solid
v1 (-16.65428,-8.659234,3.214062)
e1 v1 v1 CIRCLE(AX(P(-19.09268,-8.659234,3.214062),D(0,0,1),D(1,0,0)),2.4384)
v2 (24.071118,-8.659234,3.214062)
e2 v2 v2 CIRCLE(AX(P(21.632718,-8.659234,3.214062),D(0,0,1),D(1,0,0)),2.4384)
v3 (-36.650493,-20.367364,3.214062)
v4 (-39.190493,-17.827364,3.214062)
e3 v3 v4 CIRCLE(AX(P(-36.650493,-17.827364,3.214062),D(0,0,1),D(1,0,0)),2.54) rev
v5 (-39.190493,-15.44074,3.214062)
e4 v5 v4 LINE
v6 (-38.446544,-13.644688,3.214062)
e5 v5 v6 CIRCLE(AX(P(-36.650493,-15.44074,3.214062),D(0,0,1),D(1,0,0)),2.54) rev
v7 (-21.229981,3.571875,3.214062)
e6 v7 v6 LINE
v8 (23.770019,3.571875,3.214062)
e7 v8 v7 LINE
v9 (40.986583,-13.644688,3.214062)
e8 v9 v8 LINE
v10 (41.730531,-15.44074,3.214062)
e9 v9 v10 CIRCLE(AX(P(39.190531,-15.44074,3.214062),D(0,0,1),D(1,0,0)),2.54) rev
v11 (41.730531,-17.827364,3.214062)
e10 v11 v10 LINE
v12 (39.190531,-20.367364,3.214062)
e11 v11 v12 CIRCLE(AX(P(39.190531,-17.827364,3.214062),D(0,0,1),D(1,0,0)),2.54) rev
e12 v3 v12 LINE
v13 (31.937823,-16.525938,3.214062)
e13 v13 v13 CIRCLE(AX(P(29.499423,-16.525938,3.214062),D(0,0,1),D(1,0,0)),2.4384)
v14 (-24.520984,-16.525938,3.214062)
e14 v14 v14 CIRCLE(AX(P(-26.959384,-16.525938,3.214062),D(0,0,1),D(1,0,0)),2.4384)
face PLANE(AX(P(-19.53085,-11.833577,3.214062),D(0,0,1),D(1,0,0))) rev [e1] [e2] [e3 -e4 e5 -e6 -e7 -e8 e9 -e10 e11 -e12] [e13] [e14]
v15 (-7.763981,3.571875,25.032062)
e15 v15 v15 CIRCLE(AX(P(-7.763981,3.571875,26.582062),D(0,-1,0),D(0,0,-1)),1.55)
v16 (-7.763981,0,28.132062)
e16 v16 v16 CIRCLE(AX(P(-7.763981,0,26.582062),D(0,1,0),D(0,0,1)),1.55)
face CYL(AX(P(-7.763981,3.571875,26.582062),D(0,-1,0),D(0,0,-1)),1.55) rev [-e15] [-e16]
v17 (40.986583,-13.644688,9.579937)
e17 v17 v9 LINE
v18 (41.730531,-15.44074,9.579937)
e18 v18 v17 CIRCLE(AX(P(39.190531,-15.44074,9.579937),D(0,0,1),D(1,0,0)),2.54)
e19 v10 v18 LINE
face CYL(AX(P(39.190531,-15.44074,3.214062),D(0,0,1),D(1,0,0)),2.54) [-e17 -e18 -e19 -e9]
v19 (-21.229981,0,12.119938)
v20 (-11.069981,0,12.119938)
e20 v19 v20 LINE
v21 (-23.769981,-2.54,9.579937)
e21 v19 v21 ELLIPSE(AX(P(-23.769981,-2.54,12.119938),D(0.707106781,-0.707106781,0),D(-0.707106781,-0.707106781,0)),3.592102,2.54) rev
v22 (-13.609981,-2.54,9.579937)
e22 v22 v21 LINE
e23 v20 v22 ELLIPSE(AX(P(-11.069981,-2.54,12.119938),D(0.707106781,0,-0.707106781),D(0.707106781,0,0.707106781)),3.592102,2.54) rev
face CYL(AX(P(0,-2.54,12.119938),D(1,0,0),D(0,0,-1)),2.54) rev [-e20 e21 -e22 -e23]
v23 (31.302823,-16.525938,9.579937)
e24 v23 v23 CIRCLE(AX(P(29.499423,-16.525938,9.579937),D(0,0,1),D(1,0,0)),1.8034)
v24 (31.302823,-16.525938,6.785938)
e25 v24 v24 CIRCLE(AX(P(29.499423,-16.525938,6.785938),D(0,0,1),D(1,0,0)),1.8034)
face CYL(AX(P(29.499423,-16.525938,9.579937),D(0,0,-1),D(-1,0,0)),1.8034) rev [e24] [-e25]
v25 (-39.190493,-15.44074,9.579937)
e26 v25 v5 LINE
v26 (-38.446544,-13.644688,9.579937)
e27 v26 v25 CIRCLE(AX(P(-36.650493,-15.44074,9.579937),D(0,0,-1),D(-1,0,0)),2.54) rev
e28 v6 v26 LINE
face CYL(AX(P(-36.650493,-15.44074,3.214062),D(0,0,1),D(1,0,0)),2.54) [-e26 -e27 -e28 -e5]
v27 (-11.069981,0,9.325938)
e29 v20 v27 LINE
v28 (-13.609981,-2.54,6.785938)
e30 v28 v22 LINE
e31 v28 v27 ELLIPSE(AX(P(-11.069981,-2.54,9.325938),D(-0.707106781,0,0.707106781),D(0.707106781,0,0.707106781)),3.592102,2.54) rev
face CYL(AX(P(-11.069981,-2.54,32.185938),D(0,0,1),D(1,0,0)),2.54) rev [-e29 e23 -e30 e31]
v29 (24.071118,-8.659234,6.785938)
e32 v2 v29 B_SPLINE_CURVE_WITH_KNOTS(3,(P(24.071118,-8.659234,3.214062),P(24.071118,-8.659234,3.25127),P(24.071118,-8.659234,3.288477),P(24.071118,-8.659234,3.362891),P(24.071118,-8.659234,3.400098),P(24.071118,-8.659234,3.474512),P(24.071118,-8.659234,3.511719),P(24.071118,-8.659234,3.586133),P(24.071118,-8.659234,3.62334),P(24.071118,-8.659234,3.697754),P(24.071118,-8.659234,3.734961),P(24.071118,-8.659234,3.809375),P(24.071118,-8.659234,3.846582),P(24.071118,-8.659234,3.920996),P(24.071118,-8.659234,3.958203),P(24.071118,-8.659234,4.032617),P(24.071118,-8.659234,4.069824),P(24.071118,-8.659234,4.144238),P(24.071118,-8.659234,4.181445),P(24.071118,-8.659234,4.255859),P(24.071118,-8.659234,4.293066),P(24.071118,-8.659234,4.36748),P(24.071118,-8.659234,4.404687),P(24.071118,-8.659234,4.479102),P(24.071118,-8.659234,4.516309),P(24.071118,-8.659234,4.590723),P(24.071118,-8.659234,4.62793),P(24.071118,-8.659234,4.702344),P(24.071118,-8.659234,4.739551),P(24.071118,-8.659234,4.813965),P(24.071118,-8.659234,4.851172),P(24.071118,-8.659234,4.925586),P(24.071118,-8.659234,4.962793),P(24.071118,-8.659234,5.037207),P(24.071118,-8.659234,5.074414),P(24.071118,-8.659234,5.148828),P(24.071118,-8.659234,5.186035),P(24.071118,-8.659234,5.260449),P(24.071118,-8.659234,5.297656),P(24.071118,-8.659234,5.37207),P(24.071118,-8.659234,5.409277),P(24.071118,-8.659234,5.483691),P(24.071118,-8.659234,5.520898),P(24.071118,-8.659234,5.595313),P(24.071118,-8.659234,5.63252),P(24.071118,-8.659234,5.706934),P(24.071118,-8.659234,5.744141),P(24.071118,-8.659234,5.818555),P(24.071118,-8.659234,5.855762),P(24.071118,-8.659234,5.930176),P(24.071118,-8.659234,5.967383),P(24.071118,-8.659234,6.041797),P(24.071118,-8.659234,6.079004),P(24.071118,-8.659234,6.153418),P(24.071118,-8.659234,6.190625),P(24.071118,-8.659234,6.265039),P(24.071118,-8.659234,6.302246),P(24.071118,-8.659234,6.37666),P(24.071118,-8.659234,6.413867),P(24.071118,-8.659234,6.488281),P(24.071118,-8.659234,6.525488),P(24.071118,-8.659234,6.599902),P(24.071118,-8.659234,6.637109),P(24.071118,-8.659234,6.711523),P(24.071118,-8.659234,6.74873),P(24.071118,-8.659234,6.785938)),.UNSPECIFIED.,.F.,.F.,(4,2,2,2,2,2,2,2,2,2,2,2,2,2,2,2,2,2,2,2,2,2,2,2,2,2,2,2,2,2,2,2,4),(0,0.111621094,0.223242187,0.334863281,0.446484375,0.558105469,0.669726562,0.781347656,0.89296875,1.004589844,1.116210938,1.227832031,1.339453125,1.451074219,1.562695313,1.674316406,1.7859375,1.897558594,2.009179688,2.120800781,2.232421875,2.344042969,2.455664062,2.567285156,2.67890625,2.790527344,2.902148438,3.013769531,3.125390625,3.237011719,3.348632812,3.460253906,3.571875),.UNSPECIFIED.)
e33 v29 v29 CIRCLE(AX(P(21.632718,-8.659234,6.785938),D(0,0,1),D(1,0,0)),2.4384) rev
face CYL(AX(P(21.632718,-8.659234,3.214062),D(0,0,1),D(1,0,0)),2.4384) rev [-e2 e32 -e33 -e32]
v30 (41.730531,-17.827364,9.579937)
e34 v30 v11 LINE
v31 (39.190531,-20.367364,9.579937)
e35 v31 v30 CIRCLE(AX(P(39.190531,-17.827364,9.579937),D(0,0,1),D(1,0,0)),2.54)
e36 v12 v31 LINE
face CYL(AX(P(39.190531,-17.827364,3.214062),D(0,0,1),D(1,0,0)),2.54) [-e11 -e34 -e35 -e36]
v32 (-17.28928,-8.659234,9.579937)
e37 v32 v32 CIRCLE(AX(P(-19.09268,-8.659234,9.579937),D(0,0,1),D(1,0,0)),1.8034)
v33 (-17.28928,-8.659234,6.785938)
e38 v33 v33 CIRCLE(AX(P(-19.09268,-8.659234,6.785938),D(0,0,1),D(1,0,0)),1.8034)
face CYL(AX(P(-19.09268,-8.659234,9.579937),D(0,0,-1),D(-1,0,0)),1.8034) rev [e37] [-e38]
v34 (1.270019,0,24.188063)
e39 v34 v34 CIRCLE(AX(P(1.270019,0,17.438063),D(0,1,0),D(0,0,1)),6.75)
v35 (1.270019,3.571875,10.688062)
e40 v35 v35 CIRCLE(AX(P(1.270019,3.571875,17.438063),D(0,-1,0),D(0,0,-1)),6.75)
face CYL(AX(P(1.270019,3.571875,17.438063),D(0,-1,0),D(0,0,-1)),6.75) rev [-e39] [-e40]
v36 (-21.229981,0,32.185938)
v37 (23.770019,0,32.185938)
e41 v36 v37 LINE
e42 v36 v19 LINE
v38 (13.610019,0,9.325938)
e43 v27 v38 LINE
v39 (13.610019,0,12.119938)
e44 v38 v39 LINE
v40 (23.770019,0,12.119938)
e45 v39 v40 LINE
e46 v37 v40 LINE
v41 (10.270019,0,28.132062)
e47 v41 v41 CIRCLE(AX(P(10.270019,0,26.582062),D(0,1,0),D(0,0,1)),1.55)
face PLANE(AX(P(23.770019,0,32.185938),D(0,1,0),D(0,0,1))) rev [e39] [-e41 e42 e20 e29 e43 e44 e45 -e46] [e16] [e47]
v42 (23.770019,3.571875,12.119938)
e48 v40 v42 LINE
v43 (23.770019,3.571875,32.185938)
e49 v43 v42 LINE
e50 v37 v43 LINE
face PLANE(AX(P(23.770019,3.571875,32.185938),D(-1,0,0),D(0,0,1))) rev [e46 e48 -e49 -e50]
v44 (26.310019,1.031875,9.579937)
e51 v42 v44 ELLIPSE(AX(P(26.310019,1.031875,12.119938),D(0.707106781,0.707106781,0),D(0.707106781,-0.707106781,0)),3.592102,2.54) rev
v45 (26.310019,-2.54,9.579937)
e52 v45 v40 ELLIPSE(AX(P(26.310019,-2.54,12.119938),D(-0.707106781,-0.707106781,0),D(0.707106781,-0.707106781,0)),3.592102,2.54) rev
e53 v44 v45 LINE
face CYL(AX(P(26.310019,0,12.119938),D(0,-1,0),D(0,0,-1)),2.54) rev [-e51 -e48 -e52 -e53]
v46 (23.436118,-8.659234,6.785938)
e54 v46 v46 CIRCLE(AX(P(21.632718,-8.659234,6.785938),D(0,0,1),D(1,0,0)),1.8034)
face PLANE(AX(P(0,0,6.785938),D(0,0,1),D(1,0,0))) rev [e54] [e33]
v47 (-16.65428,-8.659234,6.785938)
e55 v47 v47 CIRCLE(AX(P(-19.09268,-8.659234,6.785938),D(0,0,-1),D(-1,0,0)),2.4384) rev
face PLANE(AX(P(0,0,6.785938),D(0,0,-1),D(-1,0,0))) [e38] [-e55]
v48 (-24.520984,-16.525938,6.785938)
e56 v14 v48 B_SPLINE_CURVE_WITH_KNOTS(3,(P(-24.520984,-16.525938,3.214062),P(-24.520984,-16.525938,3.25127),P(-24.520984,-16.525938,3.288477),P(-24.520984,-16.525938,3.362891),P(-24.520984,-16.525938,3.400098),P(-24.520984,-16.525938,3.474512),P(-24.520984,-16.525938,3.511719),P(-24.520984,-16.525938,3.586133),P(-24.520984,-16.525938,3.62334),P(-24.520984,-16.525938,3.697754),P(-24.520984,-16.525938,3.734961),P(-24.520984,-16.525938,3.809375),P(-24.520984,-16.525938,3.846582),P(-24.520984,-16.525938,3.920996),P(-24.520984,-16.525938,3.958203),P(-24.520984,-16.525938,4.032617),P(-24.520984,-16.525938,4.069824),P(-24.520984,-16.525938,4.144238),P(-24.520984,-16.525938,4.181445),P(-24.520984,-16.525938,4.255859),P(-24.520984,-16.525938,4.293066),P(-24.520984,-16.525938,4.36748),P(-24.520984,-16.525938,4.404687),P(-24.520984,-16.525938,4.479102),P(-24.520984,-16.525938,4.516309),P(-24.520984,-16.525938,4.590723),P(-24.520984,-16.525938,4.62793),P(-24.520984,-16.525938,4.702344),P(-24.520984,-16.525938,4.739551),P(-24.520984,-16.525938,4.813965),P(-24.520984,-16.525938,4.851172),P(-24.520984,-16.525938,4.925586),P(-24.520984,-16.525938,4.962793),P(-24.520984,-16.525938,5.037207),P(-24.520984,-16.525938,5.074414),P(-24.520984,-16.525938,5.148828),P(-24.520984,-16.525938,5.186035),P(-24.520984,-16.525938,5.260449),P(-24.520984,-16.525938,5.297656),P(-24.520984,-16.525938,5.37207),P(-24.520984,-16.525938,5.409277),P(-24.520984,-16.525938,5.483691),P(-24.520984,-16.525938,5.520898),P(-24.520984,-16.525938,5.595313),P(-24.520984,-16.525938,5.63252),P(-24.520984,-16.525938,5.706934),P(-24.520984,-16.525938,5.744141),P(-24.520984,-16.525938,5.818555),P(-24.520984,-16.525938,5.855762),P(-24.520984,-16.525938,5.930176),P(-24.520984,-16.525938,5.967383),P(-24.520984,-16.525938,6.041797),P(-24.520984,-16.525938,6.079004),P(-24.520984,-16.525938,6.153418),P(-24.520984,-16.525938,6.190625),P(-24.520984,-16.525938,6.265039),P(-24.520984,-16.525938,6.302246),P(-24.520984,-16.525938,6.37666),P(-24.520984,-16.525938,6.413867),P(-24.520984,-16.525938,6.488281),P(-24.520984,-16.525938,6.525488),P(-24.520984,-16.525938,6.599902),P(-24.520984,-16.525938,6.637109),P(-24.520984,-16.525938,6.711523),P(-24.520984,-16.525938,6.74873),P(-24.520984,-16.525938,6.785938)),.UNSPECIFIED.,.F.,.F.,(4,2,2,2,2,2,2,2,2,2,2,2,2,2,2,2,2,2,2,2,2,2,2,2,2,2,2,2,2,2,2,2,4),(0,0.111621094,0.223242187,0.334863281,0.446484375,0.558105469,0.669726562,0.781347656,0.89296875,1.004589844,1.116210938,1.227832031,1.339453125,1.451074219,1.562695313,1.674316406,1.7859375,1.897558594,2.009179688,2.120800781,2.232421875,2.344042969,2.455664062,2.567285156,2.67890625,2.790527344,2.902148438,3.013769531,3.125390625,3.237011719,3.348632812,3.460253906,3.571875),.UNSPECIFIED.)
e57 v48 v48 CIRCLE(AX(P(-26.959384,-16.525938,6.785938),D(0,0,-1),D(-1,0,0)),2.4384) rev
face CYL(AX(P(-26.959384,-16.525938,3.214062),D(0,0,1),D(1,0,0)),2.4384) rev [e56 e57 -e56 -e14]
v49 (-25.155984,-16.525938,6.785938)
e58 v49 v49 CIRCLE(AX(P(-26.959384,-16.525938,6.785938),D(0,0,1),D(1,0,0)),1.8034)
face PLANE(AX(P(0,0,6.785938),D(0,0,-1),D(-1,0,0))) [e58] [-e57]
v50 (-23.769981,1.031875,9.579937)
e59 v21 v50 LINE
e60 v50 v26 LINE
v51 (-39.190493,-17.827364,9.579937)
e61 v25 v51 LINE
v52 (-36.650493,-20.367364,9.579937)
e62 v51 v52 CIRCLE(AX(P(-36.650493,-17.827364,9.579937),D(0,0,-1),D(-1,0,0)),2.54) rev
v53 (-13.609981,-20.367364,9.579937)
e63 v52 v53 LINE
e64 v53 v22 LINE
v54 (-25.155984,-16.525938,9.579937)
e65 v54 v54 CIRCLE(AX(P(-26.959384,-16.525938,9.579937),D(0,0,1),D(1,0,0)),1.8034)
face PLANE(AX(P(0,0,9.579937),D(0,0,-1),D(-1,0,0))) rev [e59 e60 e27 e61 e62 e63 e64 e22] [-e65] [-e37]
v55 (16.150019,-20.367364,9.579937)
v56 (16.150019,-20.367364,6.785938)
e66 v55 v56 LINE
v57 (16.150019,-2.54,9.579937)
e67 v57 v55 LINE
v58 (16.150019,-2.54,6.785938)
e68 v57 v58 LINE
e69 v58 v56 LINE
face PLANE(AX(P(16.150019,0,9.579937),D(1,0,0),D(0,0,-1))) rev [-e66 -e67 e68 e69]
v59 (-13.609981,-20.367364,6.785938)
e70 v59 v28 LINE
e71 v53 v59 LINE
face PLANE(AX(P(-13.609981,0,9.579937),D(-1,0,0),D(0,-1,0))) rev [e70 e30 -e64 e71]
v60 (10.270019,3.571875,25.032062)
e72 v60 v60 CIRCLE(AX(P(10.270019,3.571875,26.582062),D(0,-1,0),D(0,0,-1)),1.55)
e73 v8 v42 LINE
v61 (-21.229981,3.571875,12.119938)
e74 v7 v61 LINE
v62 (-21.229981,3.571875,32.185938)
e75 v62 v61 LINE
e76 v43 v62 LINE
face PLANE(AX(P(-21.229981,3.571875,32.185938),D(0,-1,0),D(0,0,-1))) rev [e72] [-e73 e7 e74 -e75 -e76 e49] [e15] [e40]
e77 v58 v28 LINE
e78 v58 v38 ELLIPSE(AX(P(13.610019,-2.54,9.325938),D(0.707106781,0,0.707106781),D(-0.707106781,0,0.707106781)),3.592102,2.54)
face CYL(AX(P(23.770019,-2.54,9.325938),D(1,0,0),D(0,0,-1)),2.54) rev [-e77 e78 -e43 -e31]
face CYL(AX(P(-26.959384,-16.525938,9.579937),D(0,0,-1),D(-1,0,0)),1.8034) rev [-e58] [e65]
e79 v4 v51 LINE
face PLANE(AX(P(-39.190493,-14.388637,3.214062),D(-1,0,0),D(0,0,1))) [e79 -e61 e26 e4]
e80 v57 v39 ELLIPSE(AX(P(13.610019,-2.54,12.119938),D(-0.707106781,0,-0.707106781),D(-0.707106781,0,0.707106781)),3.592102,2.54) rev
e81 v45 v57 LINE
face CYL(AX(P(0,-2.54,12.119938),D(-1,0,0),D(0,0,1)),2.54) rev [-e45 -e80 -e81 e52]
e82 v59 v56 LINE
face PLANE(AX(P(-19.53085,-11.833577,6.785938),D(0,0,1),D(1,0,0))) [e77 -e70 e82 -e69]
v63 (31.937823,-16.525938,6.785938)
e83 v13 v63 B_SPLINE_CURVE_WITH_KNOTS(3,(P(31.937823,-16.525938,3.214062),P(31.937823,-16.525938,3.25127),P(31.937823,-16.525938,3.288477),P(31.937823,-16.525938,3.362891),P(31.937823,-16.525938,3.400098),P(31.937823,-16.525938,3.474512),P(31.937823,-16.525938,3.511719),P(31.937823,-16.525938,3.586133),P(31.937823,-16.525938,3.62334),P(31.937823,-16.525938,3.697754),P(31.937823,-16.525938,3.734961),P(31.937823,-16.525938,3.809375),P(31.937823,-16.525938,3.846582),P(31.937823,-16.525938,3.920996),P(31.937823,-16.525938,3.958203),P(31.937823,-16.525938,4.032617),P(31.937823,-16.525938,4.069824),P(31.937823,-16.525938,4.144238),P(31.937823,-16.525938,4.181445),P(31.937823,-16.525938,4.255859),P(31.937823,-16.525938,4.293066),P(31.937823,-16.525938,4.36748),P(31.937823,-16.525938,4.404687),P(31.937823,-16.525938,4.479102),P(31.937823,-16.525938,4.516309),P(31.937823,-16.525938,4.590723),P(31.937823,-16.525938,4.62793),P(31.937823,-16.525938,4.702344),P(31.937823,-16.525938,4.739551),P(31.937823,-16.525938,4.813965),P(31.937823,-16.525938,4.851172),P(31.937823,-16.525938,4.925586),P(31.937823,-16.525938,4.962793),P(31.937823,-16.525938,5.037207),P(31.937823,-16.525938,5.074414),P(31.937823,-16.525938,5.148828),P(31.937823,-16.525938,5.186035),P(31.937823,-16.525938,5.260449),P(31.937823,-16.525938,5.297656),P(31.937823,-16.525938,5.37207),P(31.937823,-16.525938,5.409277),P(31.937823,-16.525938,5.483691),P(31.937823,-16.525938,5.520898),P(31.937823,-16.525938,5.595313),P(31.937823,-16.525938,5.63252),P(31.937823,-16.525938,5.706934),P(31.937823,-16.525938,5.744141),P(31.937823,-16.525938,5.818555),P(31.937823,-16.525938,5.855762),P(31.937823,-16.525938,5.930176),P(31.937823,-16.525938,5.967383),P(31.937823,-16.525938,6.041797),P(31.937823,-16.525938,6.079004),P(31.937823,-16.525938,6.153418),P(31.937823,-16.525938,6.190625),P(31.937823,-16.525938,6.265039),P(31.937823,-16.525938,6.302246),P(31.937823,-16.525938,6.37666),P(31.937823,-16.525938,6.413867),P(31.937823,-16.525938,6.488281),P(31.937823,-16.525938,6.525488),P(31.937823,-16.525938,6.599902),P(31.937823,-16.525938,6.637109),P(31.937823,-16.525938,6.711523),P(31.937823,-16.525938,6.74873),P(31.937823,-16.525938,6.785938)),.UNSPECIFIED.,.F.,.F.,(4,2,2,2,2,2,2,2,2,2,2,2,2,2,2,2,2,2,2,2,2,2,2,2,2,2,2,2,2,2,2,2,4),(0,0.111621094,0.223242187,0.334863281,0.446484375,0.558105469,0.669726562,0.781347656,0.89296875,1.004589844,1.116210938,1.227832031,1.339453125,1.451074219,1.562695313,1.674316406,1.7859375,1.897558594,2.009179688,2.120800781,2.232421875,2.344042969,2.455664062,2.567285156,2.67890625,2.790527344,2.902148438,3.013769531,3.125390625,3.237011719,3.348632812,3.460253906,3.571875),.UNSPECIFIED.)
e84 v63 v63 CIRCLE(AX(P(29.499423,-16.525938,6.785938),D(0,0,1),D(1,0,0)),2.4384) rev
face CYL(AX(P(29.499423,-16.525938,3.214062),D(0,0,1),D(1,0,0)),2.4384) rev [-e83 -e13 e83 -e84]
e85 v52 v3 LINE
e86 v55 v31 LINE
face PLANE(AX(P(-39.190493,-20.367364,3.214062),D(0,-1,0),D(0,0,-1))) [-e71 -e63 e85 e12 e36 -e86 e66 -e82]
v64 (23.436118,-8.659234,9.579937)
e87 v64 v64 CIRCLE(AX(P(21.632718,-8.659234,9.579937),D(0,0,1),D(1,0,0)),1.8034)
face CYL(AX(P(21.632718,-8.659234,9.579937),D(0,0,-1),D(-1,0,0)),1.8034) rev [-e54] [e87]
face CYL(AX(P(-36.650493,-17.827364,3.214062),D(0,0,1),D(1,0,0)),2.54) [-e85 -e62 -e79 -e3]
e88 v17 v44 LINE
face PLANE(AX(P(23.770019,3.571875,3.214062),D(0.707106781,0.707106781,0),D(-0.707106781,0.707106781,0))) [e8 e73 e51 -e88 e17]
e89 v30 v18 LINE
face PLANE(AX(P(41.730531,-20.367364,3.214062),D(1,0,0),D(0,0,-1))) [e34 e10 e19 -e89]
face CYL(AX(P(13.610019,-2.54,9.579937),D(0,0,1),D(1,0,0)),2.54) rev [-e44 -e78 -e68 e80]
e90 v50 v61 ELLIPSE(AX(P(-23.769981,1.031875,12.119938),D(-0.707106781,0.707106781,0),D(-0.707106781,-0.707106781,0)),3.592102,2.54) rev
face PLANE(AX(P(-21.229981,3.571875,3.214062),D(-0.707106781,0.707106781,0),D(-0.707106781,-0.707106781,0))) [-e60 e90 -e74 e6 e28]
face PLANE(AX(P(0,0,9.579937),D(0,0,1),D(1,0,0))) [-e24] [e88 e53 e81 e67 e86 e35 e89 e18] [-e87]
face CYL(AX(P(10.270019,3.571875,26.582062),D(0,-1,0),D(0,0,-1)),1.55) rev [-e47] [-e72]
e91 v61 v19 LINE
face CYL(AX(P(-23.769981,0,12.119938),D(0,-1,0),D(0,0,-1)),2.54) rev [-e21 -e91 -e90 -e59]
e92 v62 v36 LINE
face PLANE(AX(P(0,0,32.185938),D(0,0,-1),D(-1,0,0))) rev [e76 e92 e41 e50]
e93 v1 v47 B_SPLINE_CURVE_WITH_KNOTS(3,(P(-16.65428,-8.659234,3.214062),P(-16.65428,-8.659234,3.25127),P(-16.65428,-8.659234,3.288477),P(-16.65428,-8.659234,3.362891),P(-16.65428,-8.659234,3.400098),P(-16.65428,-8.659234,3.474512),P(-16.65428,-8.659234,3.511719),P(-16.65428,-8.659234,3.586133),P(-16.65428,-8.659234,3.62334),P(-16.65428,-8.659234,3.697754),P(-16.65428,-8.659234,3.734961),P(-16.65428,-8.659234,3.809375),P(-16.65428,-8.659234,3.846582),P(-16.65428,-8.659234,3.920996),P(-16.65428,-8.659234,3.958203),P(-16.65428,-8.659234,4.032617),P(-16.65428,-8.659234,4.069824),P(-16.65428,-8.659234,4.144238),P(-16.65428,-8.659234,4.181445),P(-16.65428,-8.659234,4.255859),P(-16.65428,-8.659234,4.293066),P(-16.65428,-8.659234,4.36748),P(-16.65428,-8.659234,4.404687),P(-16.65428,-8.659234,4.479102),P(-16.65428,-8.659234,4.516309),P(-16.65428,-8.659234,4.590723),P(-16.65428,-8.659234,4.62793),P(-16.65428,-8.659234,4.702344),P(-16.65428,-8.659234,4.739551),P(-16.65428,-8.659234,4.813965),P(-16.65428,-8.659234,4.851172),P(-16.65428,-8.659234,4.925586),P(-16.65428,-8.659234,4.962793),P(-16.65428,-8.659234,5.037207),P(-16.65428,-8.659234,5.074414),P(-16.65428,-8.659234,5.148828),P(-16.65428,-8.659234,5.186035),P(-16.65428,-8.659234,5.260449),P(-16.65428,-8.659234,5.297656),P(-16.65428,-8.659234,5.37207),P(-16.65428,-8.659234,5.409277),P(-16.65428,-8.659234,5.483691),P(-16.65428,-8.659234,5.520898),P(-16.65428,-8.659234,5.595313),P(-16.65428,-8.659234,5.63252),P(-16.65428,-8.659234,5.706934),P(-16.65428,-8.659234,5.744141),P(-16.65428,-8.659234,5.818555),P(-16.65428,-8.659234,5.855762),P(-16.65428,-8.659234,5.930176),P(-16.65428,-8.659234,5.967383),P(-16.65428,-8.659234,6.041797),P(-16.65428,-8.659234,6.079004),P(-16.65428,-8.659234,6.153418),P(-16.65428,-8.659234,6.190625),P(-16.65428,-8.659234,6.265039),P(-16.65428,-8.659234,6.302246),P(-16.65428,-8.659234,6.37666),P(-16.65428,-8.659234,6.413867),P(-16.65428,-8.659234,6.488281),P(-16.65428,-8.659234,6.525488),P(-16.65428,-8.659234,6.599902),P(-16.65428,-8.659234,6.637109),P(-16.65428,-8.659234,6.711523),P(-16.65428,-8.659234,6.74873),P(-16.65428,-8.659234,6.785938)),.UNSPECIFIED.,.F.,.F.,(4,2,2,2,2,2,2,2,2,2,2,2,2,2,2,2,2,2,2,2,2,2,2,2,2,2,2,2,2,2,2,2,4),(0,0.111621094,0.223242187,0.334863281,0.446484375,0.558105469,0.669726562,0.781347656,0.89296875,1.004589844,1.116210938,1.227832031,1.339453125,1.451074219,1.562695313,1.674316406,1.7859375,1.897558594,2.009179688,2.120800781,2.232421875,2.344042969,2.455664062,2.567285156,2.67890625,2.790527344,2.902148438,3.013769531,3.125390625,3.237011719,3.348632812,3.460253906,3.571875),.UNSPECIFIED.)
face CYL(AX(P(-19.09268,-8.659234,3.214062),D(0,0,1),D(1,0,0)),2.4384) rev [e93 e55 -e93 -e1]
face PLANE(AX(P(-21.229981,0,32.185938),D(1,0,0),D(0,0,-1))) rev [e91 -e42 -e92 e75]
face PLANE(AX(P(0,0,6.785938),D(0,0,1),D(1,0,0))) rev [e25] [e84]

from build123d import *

# Parameters (mm, degrees)
BOSS_EXTRUDE1_DEPTH      = 1.7859375
BOSS_EXTRUDE1_DEPTH_BACK = 1.7859375
SKETCH2_W                = 45
SKETCH2_H                = 3.571875
BOSS_EXTRUDE2_DEPTH      = 25.4
FILLET1_R                = 2
SKETCH9_W                = 44.9012818
SKETCH9_H                = 1.417156311
CUT_EXTRUDE1_DEPTH       = 10
BOSS_EXTRUDE3_DEPTH      = 3.571875
SKETCH14_R               = 2.4384
CUT_EXTRUDE4_DEPTH       = 53.928506192
CUT_EXTRUDE5_DEPTH       = 57.499569383
CUT_EXTRUDE5_DEPTH_BACK  = 57.499569383
SKETCH15_R               = 6.75
SKETCH15_R_2             = 1.55
SKETCH19_R               = 1.8034
BOSS_EXTRUDE6_DEPTH      = 2.794
FILLET3_R                = 2.54


with BuildPart() as part:
    # Sketch1 → Boss-Extrude1 (new, two sides: drawn at the far end of the back side and taken through both)
    with BuildSketch(Plane.XY.offset(5).offset(-BOSS_EXTRUDE1_DEPTH_BACK)):
        with BuildLine():
            Line((-21.183407813, 0), (-21.183407813, -8.813455393))
            ThreePointArc((-21.183407813, -8.813455393), (-22.866221682, -12.686440931), (-19.530849883, -15.276262248))
            Line((-19.530849883, -15.276262248), (24.68248716, -15.276262248))
            ThreePointArc((24.68248716, -15.276262248), (25.214329472, -14.744419936), (24.68248716, -14.212577623))
            Line((24.68248716, -14.212577623), (23.717873987, 0))
            Line((23.717873987, 0), (23.717873987, 4.989031311))
            Line((23.717873987, 4.989031311), (-21.183407813, 4.989031311))
            Line((-21.183407813, 4.989031311), (-21.183407813, 0))
        make_face()
    extrude(amount=BOSS_EXTRUDE1_DEPTH + BOSS_EXTRUDE1_DEPTH_BACK)

    # Sketch2 → Boss-Extrude2 (add)
    with BuildSketch(Plane.XY.offset(6.7859375)):
        with Locations((1.270019176, 1.7859375)):
            Rectangle(SKETCH2_W, SKETCH2_H)
    extrude(amount=BOSS_EXTRUDE2_DEPTH)

    # Fillet1
    fillet1_edges = [part.edges().sort_by_distance(p)[0] for p in [
        (1.267233087, 4.989031311, 3.2140625),
    ]]
    fillet(fillet1_edges, radius=FILLET1_R)

    # Sketch9 → Cut-Extrude1 (cut)
    with BuildSketch(Plane.XY.offset(6.7859375)):
        with Locations((1.267233087, 4.280453156)):
            Rectangle(SKETCH9_W, SKETCH9_H)
    extrude(amount=-CUT_EXTRUDE1_DEPTH, mode=Mode.SUBTRACT)

    # Sketch13 → Boss-Extrude3 (add, through all)
    with BuildSketch(Plane.XY.offset(6.7859375)):
        Polygon((-21.229980824, 3.571875), (-39.190493066, -14.388637242), (-39.190493066, -20.367363974), (41.730531418, -20.367363974), (41.730531418, -14.388637242), (23.770019176, 3.571875), align=None)
    extrude(amount=-BOSS_EXTRUDE3_DEPTH)

    # Sketch14 → Cut-Extrude4 (cut, through all)
    with BuildSketch(Plane.XY.offset(6.7859375)):
        with Locations((-26.959384229, -16.525938199)):
            Circle(SKETCH14_R)
        with Locations((-19.092679867, -8.659233837)):
            Circle(SKETCH14_R)
        with Locations((21.632718219, -8.659233837)):
            Circle(SKETCH14_R)
        with Locations((29.499422581, -16.525938199)):
            Circle(SKETCH14_R)
    extrude(amount=-CUT_EXTRUDE4_DEPTH, mode=Mode.SUBTRACT)

    # Sketch15 → Cut-Extrude5 (cut, two sides: drawn at the far end of the back side and taken through both)
    with BuildSketch(Plane.XZ.offset(-CUT_EXTRUDE5_DEPTH_BACK)):
        with Locations(Location((1.270019176, 17.4380625, 0), (0, 0, 270))):
            Circle(SKETCH15_R)
        with Locations(Location((-7.763980824, 26.5820625, 0), (0, 0, 270))):
            Circle(SKETCH15_R_2)
        with Locations(Location((10.270019176, 26.5820625, 0), (0, 0, 270))):
            Circle(SKETCH15_R_2)
    extrude(amount=CUT_EXTRUDE5_DEPTH + CUT_EXTRUDE5_DEPTH_BACK, mode=Mode.SUBTRACT)

    # Sketch19 → Boss-Extrude6 (add)
    # profile 1 of 2: a face of its own
    with BuildSketch(Plane.XY.offset(6.7859375)):
        Polygon((-39.190493066, -14.388637242), (-21.229980824, 3.571875), (-21.229980824, 0), (-13.609980824, 0), (-13.609980824, -20.367363974), (-39.190493066, -20.367363974), align=None)
        with Locations((-19.092679867, -8.659233837)):
            Circle(SKETCH19_R, mode=Mode.SUBTRACT)
        with Locations((-26.959384229, -16.525938199)):
            Circle(SKETCH19_R, mode=Mode.SUBTRACT)
    # profile 2 of 2: a face of its own
    with BuildSketch(Plane.XY.offset(6.7859375)):
        Polygon((41.730531418, -20.367363974), (41.730531418, -14.388637242), (23.770019176, 3.571875), (23.770019176, 0), (16.150019176, 0), (16.150019176, -20.367363974), align=None)
        with Locations((21.632718219, -8.659233837)):
            Circle(SKETCH19_R, mode=Mode.SUBTRACT)
        with Locations((29.499422581, -16.525938199)):
            Circle(SKETCH19_R, mode=Mode.SUBTRACT)
    extrude(amount=BOSS_EXTRUDE6_DEPTH)

    # Fillet3
    # the kernel refuses this fillet: 2.54 mm, written as the material it adds along each edge
    with BuildSketch(Plane(origin=(16.150019176, 0, 6.7859375), x_dir=(0, -1, 0), z_dir=(-1, 0, 0))) as fillet3_piece_1:
        with BuildLine():
            CenterArc((FILLET3_R, FILLET3_R), FILLET3_R, 180, 90)
            Line((0, FILLET3_R), (-FILLET3_R * 0.02, FILLET3_R))
            Line((-FILLET3_R * 0.02, FILLET3_R), (-FILLET3_R * 0.02, -FILLET3_R * 0.02))
            Line((-FILLET3_R * 0.02, -FILLET3_R * 0.02), (FILLET3_R, -FILLET3_R * 0.02))
            Line((FILLET3_R, -FILLET3_R * 0.02), (FILLET3_R, 0))
        make_face()
    extrude(amount=29.76)
    with BuildSketch(Plane(origin=(-21.229980824, 0, 9.5799375), x_dir=(0, -1, 0), z_dir=(1, 0, 0))) as fillet3_piece_2:
        with BuildLine():
            CenterArc((FILLET3_R, -FILLET3_R), FILLET3_R, 90, 90)
            Line((0, -FILLET3_R), (-FILLET3_R * 0.02, -FILLET3_R))
            Line((-FILLET3_R * 0.02, -FILLET3_R), (-FILLET3_R * 0.02, FILLET3_R * 0.02))
            Line((-FILLET3_R * 0.02, FILLET3_R * 0.02), (FILLET3_R, FILLET3_R * 0.02))
            Line((FILLET3_R, FILLET3_R * 0.02), (FILLET3_R, 0))
        make_face()
    extrude(amount=7.62)
    with BuildSketch(Plane(origin=(-21.229980824, 3.571875, 9.5799375), x_dir=(-1, 0, 0), z_dir=(0, -1, 0))) as fillet3_piece_3_section:
        with BuildLine():
            CenterArc((FILLET3_R, -FILLET3_R), FILLET3_R, 90, 90)
            Line((0, -FILLET3_R), (-FILLET3_R * 0.02, -FILLET3_R))
            Line((-FILLET3_R * 0.02, -FILLET3_R), (-FILLET3_R * 0.02, FILLET3_R * 0.02))
            Line((-FILLET3_R * 0.02, FILLET3_R * 0.02), (FILLET3_R, FILLET3_R * 0.02))
            Line((FILLET3_R, FILLET3_R * 0.02), (FILLET3_R, 0))
        make_face()
    fillet3_piece_3 = extrude(amount=3.571875, mode=Mode.PRIVATE)
    fillet3_piece_3 = split(fillet3_piece_3, bisect_by=Plane(origin=(-22.480055671, 2.321800154, 10.2136759), z_dir=(0.7071067811865489, -0.7071067811865461, 0)), keep=Keep.TOP, mode=Mode.PRIVATE)
    add(fillet3_piece_3)
    with BuildSketch(Plane(origin=(-13.609980824, 0, 6.7859375), x_dir=(0, -1, 0), z_dir=(0, 0, 1))) as fillet3_piece_4:
        with BuildLine():
            CenterArc((FILLET3_R, FILLET3_R), FILLET3_R, 180, 90)
            Line((0, FILLET3_R), (-FILLET3_R * 0.02, FILLET3_R))
            Line((-FILLET3_R * 0.02, FILLET3_R), (-FILLET3_R * 0.02, -FILLET3_R * 0.02))
            Line((-FILLET3_R * 0.02, -FILLET3_R * 0.02), (FILLET3_R, -FILLET3_R * 0.02))
            Line((FILLET3_R, -FILLET3_R * 0.02), (FILLET3_R, 0))
        make_face()
    extrude(amount=2.794)
    with BuildSketch(Plane(origin=(23.770019176, 3.571875, 9.5799375), x_dir=(1, 0, 0), z_dir=(0, -1, 0))) as fillet3_piece_5_section:
        with BuildLine():
            CenterArc((FILLET3_R, FILLET3_R), FILLET3_R, 180, 90)
            Line((0, FILLET3_R), (-FILLET3_R * 0.02, FILLET3_R))
            Line((-FILLET3_R * 0.02, FILLET3_R), (-FILLET3_R * 0.02, -FILLET3_R * 0.02))
            Line((-FILLET3_R * 0.02, -FILLET3_R * 0.02), (FILLET3_R, -FILLET3_R * 0.02))
            Line((FILLET3_R, -FILLET3_R * 0.02), (FILLET3_R, 0))
        make_face()
    fillet3_piece_5 = extrude(amount=3.571875, mode=Mode.PRIVATE)
    fillet3_piece_5 = split(fillet3_piece_5, bisect_by=Plane(origin=(25.020094022, 2.321800154, 10.2136759), z_dir=(-0.7071067811865436, -0.7071067811865516, 0)), keep=Keep.TOP, mode=Mode.PRIVATE)
    add(fillet3_piece_5)
    with BuildSketch(Plane(origin=(23.770019176, 0, 9.5799375), x_dir=(0, -1, 0), z_dir=(-1, 0, 0))) as fillet3_piece_6:
        with BuildLine():
            CenterArc((FILLET3_R, FILLET3_R), FILLET3_R, 180, 90)
            Line((0, FILLET3_R), (-FILLET3_R * 0.02, FILLET3_R))
            Line((-FILLET3_R * 0.02, FILLET3_R), (-FILLET3_R * 0.02, -FILLET3_R * 0.02))
            Line((-FILLET3_R * 0.02, -FILLET3_R * 0.02), (FILLET3_R, -FILLET3_R * 0.02))
            Line((FILLET3_R, -FILLET3_R * 0.02), (FILLET3_R, 0))
        make_face()
    extrude(amount=7.62)
    with BuildSketch(Plane(origin=(16.150019176, 0, 6.7859375), x_dir=(0, -1, 0), z_dir=(0, 0, 1))) as fillet3_piece_7:
        with BuildLine():
            CenterArc((FILLET3_R, -FILLET3_R), FILLET3_R, 90, 90)
            Line((0, -FILLET3_R), (-FILLET3_R * 0.02, -FILLET3_R))
            Line((-FILLET3_R * 0.02, -FILLET3_R), (-FILLET3_R * 0.02, FILLET3_R * 0.02))
            Line((-FILLET3_R * 0.02, FILLET3_R * 0.02), (FILLET3_R, FILLET3_R * 0.02))
            Line((FILLET3_R, FILLET3_R * 0.02), (FILLET3_R, 0))
        make_face()
    extrude(amount=2.794)
    with BuildSketch(Plane(origin=(16.150019176, 0, 0.4359375), x_dir=(0, -1, 0), z_dir=(0, 0, 1))) as fillet3_piece_8a_section:
        with BuildLine():
            CenterArc((FILLET3_R, -FILLET3_R), FILLET3_R, 90, 90)
            Line((0, -FILLET3_R), (-FILLET3_R * 0.02, -FILLET3_R))
            Line((-FILLET3_R * 0.02, -FILLET3_R), (-FILLET3_R * 0.02, FILLET3_R * 0.02))
            Line((-FILLET3_R * 0.02, FILLET3_R * 0.02), (FILLET3_R, FILLET3_R * 0.02))
            Line((FILLET3_R, FILLET3_R * 0.02), (FILLET3_R, 0))
        make_face()
    fillet3_piece_8a = extrude(amount=9.144, mode=Mode.PRIVATE)
    fillet3_piece_8a = split(fillet3_piece_8a, bisect_by=Plane(origin=(15.574975586, -0.57504359, 6.7859375), z_dir=(0, 0, -1)), keep=Keep.TOP, mode=Mode.PRIVATE)
    with BuildSketch(Plane(origin=(22.500019176, 0, 6.7859375), x_dir=(0, -1, 0), z_dir=(-1, 0, 0))) as fillet3_piece_8b_section:
        with BuildLine():
            CenterArc((FILLET3_R, FILLET3_R), FILLET3_R, 180, 90)
            Line((0, FILLET3_R), (-FILLET3_R * 0.02, FILLET3_R))
            Line((-FILLET3_R * 0.02, FILLET3_R), (-FILLET3_R * 0.02, -FILLET3_R * 0.02))
            Line((-FILLET3_R * 0.02, -FILLET3_R * 0.02), (FILLET3_R, -FILLET3_R * 0.02))
            Line((FILLET3_R, -FILLET3_R * 0.02), (FILLET3_R, 0))
        make_face()
    fillet3_piece_8b = extrude(amount=36.11, mode=Mode.PRIVATE)
    fillet3_piece_8b = split(fillet3_piece_8b, bisect_by=Plane(origin=(16.150019176, -0.57504359, 7.36098109), z_dir=(1, 0, 0)), keep=Keep.TOP, mode=Mode.PRIVATE)
    fillet3_piece_8 = fillet3_piece_8a & fillet3_piece_8b
    add(fillet3_piece_8)
    with BuildSketch(Plane(origin=(16.150019176, 0, 6.7859375), x_dir=(0, -1, 0), z_dir=(-1, 0, 0))) as fillet3_piece_9a_section:
        with BuildLine():
            CenterArc((FILLET3_R, FILLET3_R), FILLET3_R, 180, 90)
            Line((0, FILLET3_R), (-FILLET3_R * 0.02, FILLET3_R))
            Line((-FILLET3_R * 0.02, FILLET3_R), (-FILLET3_R * 0.02, -FILLET3_R * 0.02))
            Line((-FILLET3_R * 0.02, -FILLET3_R * 0.02), (FILLET3_R, -FILLET3_R * 0.02))
            Line((FILLET3_R, -FILLET3_R * 0.02), (FILLET3_R, 0))
        make_face()
    fillet3_piece_9a = extrude(amount=36.11, mode=Mode.PRIVATE)
    fillet3_piece_9a = split(fillet3_piece_9a, bisect_by=Plane(origin=(-13.609980824, -0.57504359, 7.36098109), z_dir=(-1, 0, 0)), keep=Keep.TOP, mode=Mode.PRIVATE)
    with BuildSketch(Plane(origin=(-13.609980824, 0, 0.4359375), x_dir=(0, -1, 0), z_dir=(0, 0, 1))) as fillet3_piece_9b_section:
        with BuildLine():
            CenterArc((FILLET3_R, FILLET3_R), FILLET3_R, 180, 90)
            Line((0, FILLET3_R), (-FILLET3_R * 0.02, FILLET3_R))
            Line((-FILLET3_R * 0.02, FILLET3_R), (-FILLET3_R * 0.02, -FILLET3_R * 0.02))
            Line((-FILLET3_R * 0.02, -FILLET3_R * 0.02), (FILLET3_R, -FILLET3_R * 0.02))
            Line((FILLET3_R, -FILLET3_R * 0.02), (FILLET3_R, 0))
        make_face()
    fillet3_piece_9b = extrude(amount=9.144, mode=Mode.PRIVATE)
    fillet3_piece_9b = split(fillet3_piece_9b, bisect_by=Plane(origin=(-13.034937234, -0.57504359, 6.7859375), z_dir=(0, 0, -1)), keep=Keep.TOP, mode=Mode.PRIVATE)
    fillet3_piece_9 = fillet3_piece_9a & fillet3_piece_9b
    add(fillet3_piece_9)
    with BuildSketch(Plane(origin=(-21.229980824, 3.571875, 9.5799375), x_dir=(-1, 0, 0), z_dir=(0, -1, 0))) as fillet3_piece_10a_section:
        with BuildLine():
            CenterArc((FILLET3_R, -FILLET3_R), FILLET3_R, 90, 90)
            Line((0, -FILLET3_R), (-FILLET3_R * 0.02, -FILLET3_R))
            Line((-FILLET3_R * 0.02, -FILLET3_R), (-FILLET3_R * 0.02, FILLET3_R * 0.02))
            Line((-FILLET3_R * 0.02, FILLET3_R * 0.02), (FILLET3_R, FILLET3_R * 0.02))
            Line((FILLET3_R, FILLET3_R * 0.02), (FILLET3_R, 0))
        make_face()
    fillet3_piece_10a = extrude(amount=9.921875, mode=Mode.PRIVATE)
    fillet3_piece_10a = split(fillet3_piece_10a, bisect_by=Plane(origin=(-21.805024414, 0, 10.15498109), z_dir=(0, -1, 0)), keep=Keep.TOP, mode=Mode.PRIVATE)
    with BuildSketch(Plane(origin=(-27.579980824, 0, 9.5799375), x_dir=(0, -1, 0), z_dir=(1, 0, 0))) as fillet3_piece_10b_section:
        with BuildLine():
            CenterArc((FILLET3_R, -FILLET3_R), FILLET3_R, 90, 90)
            Line((0, -FILLET3_R), (-FILLET3_R * 0.02, -FILLET3_R))
            Line((-FILLET3_R * 0.02, -FILLET3_R), (-FILLET3_R * 0.02, FILLET3_R * 0.02))
            Line((-FILLET3_R * 0.02, FILLET3_R * 0.02), (FILLET3_R, FILLET3_R * 0.02))
            Line((FILLET3_R, FILLET3_R * 0.02), (FILLET3_R, 0))
        make_face()
    fillet3_piece_10b = extrude(amount=13.97, mode=Mode.PRIVATE)
    fillet3_piece_10b = split(fillet3_piece_10b, bisect_by=Plane(origin=(-21.229980824, -0.57504359, 10.15498109), z_dir=(-1, 0, 0)), keep=Keep.TOP, mode=Mode.PRIVATE)
    fillet3_piece_10 = fillet3_piece_10a & fillet3_piece_10b
    add(fillet3_piece_10)
    with BuildSketch(Plane(origin=(-13.609980824, 0, 6.7859375), x_dir=(0, -1, 0), z_dir=(0, 0, 1))) as fillet3_piece_11a_section:
        with BuildLine():
            CenterArc((FILLET3_R, FILLET3_R), FILLET3_R, 180, 90)
            Line((0, FILLET3_R), (-FILLET3_R * 0.02, FILLET3_R))
            Line((-FILLET3_R * 0.02, FILLET3_R), (-FILLET3_R * 0.02, -FILLET3_R * 0.02))
            Line((-FILLET3_R * 0.02, -FILLET3_R * 0.02), (FILLET3_R, -FILLET3_R * 0.02))
            Line((FILLET3_R, -FILLET3_R * 0.02), (FILLET3_R, 0))
        make_face()
    fillet3_piece_11a = extrude(amount=9.144, mode=Mode.PRIVATE)
    fillet3_piece_11a = split(fillet3_piece_11a, bisect_by=Plane(origin=(-13.034937234, -0.57504359, 9.5799375), z_dir=(0, 0, 1)), keep=Keep.TOP, mode=Mode.PRIVATE)
    with BuildSketch(Plane(origin=(-21.229980824, 0, 9.5799375), x_dir=(0, -1, 0), z_dir=(1, 0, 0))) as fillet3_piece_11b_section:
        with BuildLine():
            CenterArc((FILLET3_R, -FILLET3_R), FILLET3_R, 90, 90)
            Line((0, -FILLET3_R), (-FILLET3_R * 0.02, -FILLET3_R))
            Line((-FILLET3_R * 0.02, -FILLET3_R), (-FILLET3_R * 0.02, FILLET3_R * 0.02))
            Line((-FILLET3_R * 0.02, FILLET3_R * 0.02), (FILLET3_R, FILLET3_R * 0.02))
            Line((FILLET3_R, FILLET3_R * 0.02), (FILLET3_R, 0))
        make_face()
    fillet3_piece_11b = extrude(amount=13.97, mode=Mode.PRIVATE)
    fillet3_piece_11b = split(fillet3_piece_11b, bisect_by=Plane(origin=(-13.609980824, -0.57504359, 10.15498109), z_dir=(1, 0, 0)), keep=Keep.TOP, mode=Mode.PRIVATE)
    fillet3_piece_11 = fillet3_piece_11a & fillet3_piece_11b
    add(fillet3_piece_11)
    with BuildSketch(Plane(origin=(23.770019176, 3.571875, 9.5799375), x_dir=(1, 0, 0), z_dir=(0, -1, 0))) as fillet3_piece_12a_section:
        with BuildLine():
            CenterArc((FILLET3_R, FILLET3_R), FILLET3_R, 180, 90)
            Line((0, FILLET3_R), (-FILLET3_R * 0.02, FILLET3_R))
            Line((-FILLET3_R * 0.02, FILLET3_R), (-FILLET3_R * 0.02, -FILLET3_R * 0.02))
            Line((-FILLET3_R * 0.02, -FILLET3_R * 0.02), (FILLET3_R, -FILLET3_R * 0.02))
            Line((FILLET3_R, -FILLET3_R * 0.02), (FILLET3_R, 0))
        make_face()
    fillet3_piece_12a = extrude(amount=9.921875, mode=Mode.PRIVATE)
    fillet3_piece_12a = split(fillet3_piece_12a, bisect_by=Plane(origin=(24.345062766, 0, 10.15498109), z_dir=(0, -1, 0)), keep=Keep.TOP, mode=Mode.PRIVATE)
    with BuildSketch(Plane(origin=(30.120019176, 0, 9.5799375), x_dir=(0, -1, 0), z_dir=(-1, 0, 0))) as fillet3_piece_12b_section:
        with BuildLine():
            CenterArc((FILLET3_R, FILLET3_R), FILLET3_R, 180, 90)
            Line((0, FILLET3_R), (-FILLET3_R * 0.02, FILLET3_R))
            Line((-FILLET3_R * 0.02, FILLET3_R), (-FILLET3_R * 0.02, -FILLET3_R * 0.02))
            Line((-FILLET3_R * 0.02, -FILLET3_R * 0.02), (FILLET3_R, -FILLET3_R * 0.02))
            Line((FILLET3_R, -FILLET3_R * 0.02), (FILLET3_R, 0))
        make_face()
    fillet3_piece_12b = extrude(amount=13.97, mode=Mode.PRIVATE)
    fillet3_piece_12b = split(fillet3_piece_12b, bisect_by=Plane(origin=(23.770019176, -0.57504359, 10.15498109), z_dir=(1, 0, 0)), keep=Keep.TOP, mode=Mode.PRIVATE)
    fillet3_piece_12 = fillet3_piece_12a & fillet3_piece_12b
    add(fillet3_piece_12)
    with BuildSketch(Plane(origin=(23.770019176, 0, 9.5799375), x_dir=(0, -1, 0), z_dir=(-1, 0, 0))) as fillet3_piece_13a_section:
        with BuildLine():
            CenterArc((FILLET3_R, FILLET3_R), FILLET3_R, 180, 90)
            Line((0, FILLET3_R), (-FILLET3_R * 0.02, FILLET3_R))
            Line((-FILLET3_R * 0.02, FILLET3_R), (-FILLET3_R * 0.02, -FILLET3_R * 0.02))
            Line((-FILLET3_R * 0.02, -FILLET3_R * 0.02), (FILLET3_R, -FILLET3_R * 0.02))
            Line((FILLET3_R, -FILLET3_R * 0.02), (FILLET3_R, 0))
        make_face()
    fillet3_piece_13a = extrude(amount=13.97, mode=Mode.PRIVATE)
    fillet3_piece_13a = split(fillet3_piece_13a, bisect_by=Plane(origin=(16.150019176, -0.57504359, 10.15498109), z_dir=(-1, 0, 0)), keep=Keep.TOP, mode=Mode.PRIVATE)
    with BuildSketch(Plane(origin=(16.150019176, 0, 6.7859375), x_dir=(0, -1, 0), z_dir=(0, 0, 1))) as fillet3_piece_13b_section:
        with BuildLine():
            CenterArc((FILLET3_R, -FILLET3_R), FILLET3_R, 90, 90)
            Line((0, -FILLET3_R), (-FILLET3_R * 0.02, -FILLET3_R))
            Line((-FILLET3_R * 0.02, -FILLET3_R), (-FILLET3_R * 0.02, FILLET3_R * 0.02))
            Line((-FILLET3_R * 0.02, FILLET3_R * 0.02), (FILLET3_R, FILLET3_R * 0.02))
            Line((FILLET3_R, FILLET3_R * 0.02), (FILLET3_R, 0))
        make_face()
    fillet3_piece_13b = extrude(amount=9.144, mode=Mode.PRIVATE)
    fillet3_piece_13b = split(fillet3_piece_13b, bisect_by=Plane(origin=(15.574975586, -0.57504359, 9.5799375), z_dir=(0, 0, 1)), keep=Keep.TOP, mode=Mode.PRIVATE)
    fillet3_piece_13 = fillet3_piece_13a & fillet3_piece_13b
    add(fillet3_piece_13)
    # the kernel refuses this fillet: 2.54 mm, written as the material it takes off along each edge
    with BuildSketch(Plane(origin=(41.730531418, -20.367363974, 3.2140625), x_dir=(0, 1, 0), z_dir=(0, 0, 1)), Plane(origin=(-39.190493066, -20.367363974, 3.2140625), x_dir=(1, 0, 0), z_dir=(0, 0, 1))) as fillet3_2_piece_1:
        with BuildLine():
            CenterArc((FILLET3_R, FILLET3_R), FILLET3_R, 180, 90)
            Line((0, FILLET3_R), (-FILLET3_R * 0.02, FILLET3_R))
            Line((-FILLET3_R * 0.02, FILLET3_R), (-FILLET3_R * 0.02, -FILLET3_R * 0.02))
            Line((-FILLET3_R * 0.02, -FILLET3_R * 0.02), (FILLET3_R, -FILLET3_R * 0.02))
            Line((FILLET3_R, -FILLET3_R * 0.02), (FILLET3_R, 0))
        make_face()
    extrude(amount=6.365875, mode=Mode.SUBTRACT)
    with BuildSketch(Plane(origin=(-39.190493066, -14.388637242, 3.2140625), x_dir=(0, -1, 0), z_dir=(0, 0, 1)), Plane(origin=(41.730531418, -14.388637242, 9.5799375), x_dir=(0, -1, 0), z_dir=(0, 0, -1))) as fillet3_2_piece_2:
        with BuildLine():
            CenterArc((FILLET3_R * 0.414213562373, FILLET3_R), FILLET3_R, 225, 45)
            Line((-FILLET3_R * 0.292893218813, FILLET3_R * 0.292893218813), (-FILLET3_R * 0.307035354437, FILLET3_R * 0.27875108319))
            Line((-FILLET3_R * 0.307035354437, FILLET3_R * 0.27875108319), (-FILLET3_R * 0.00828427124746, -FILLET3_R * 0.02))
            Line((-FILLET3_R * 0.00828427124746, -FILLET3_R * 0.02), (FILLET3_R * 0.414213562373, -FILLET3_R * 0.02))
            Line((FILLET3_R * 0.414213562373, -FILLET3_R * 0.02), (FILLET3_R * 0.414213562373, 0))
        make_face()
    extrude(amount=6.365875, mode=Mode.SUBTRACT)


solid = part.part
